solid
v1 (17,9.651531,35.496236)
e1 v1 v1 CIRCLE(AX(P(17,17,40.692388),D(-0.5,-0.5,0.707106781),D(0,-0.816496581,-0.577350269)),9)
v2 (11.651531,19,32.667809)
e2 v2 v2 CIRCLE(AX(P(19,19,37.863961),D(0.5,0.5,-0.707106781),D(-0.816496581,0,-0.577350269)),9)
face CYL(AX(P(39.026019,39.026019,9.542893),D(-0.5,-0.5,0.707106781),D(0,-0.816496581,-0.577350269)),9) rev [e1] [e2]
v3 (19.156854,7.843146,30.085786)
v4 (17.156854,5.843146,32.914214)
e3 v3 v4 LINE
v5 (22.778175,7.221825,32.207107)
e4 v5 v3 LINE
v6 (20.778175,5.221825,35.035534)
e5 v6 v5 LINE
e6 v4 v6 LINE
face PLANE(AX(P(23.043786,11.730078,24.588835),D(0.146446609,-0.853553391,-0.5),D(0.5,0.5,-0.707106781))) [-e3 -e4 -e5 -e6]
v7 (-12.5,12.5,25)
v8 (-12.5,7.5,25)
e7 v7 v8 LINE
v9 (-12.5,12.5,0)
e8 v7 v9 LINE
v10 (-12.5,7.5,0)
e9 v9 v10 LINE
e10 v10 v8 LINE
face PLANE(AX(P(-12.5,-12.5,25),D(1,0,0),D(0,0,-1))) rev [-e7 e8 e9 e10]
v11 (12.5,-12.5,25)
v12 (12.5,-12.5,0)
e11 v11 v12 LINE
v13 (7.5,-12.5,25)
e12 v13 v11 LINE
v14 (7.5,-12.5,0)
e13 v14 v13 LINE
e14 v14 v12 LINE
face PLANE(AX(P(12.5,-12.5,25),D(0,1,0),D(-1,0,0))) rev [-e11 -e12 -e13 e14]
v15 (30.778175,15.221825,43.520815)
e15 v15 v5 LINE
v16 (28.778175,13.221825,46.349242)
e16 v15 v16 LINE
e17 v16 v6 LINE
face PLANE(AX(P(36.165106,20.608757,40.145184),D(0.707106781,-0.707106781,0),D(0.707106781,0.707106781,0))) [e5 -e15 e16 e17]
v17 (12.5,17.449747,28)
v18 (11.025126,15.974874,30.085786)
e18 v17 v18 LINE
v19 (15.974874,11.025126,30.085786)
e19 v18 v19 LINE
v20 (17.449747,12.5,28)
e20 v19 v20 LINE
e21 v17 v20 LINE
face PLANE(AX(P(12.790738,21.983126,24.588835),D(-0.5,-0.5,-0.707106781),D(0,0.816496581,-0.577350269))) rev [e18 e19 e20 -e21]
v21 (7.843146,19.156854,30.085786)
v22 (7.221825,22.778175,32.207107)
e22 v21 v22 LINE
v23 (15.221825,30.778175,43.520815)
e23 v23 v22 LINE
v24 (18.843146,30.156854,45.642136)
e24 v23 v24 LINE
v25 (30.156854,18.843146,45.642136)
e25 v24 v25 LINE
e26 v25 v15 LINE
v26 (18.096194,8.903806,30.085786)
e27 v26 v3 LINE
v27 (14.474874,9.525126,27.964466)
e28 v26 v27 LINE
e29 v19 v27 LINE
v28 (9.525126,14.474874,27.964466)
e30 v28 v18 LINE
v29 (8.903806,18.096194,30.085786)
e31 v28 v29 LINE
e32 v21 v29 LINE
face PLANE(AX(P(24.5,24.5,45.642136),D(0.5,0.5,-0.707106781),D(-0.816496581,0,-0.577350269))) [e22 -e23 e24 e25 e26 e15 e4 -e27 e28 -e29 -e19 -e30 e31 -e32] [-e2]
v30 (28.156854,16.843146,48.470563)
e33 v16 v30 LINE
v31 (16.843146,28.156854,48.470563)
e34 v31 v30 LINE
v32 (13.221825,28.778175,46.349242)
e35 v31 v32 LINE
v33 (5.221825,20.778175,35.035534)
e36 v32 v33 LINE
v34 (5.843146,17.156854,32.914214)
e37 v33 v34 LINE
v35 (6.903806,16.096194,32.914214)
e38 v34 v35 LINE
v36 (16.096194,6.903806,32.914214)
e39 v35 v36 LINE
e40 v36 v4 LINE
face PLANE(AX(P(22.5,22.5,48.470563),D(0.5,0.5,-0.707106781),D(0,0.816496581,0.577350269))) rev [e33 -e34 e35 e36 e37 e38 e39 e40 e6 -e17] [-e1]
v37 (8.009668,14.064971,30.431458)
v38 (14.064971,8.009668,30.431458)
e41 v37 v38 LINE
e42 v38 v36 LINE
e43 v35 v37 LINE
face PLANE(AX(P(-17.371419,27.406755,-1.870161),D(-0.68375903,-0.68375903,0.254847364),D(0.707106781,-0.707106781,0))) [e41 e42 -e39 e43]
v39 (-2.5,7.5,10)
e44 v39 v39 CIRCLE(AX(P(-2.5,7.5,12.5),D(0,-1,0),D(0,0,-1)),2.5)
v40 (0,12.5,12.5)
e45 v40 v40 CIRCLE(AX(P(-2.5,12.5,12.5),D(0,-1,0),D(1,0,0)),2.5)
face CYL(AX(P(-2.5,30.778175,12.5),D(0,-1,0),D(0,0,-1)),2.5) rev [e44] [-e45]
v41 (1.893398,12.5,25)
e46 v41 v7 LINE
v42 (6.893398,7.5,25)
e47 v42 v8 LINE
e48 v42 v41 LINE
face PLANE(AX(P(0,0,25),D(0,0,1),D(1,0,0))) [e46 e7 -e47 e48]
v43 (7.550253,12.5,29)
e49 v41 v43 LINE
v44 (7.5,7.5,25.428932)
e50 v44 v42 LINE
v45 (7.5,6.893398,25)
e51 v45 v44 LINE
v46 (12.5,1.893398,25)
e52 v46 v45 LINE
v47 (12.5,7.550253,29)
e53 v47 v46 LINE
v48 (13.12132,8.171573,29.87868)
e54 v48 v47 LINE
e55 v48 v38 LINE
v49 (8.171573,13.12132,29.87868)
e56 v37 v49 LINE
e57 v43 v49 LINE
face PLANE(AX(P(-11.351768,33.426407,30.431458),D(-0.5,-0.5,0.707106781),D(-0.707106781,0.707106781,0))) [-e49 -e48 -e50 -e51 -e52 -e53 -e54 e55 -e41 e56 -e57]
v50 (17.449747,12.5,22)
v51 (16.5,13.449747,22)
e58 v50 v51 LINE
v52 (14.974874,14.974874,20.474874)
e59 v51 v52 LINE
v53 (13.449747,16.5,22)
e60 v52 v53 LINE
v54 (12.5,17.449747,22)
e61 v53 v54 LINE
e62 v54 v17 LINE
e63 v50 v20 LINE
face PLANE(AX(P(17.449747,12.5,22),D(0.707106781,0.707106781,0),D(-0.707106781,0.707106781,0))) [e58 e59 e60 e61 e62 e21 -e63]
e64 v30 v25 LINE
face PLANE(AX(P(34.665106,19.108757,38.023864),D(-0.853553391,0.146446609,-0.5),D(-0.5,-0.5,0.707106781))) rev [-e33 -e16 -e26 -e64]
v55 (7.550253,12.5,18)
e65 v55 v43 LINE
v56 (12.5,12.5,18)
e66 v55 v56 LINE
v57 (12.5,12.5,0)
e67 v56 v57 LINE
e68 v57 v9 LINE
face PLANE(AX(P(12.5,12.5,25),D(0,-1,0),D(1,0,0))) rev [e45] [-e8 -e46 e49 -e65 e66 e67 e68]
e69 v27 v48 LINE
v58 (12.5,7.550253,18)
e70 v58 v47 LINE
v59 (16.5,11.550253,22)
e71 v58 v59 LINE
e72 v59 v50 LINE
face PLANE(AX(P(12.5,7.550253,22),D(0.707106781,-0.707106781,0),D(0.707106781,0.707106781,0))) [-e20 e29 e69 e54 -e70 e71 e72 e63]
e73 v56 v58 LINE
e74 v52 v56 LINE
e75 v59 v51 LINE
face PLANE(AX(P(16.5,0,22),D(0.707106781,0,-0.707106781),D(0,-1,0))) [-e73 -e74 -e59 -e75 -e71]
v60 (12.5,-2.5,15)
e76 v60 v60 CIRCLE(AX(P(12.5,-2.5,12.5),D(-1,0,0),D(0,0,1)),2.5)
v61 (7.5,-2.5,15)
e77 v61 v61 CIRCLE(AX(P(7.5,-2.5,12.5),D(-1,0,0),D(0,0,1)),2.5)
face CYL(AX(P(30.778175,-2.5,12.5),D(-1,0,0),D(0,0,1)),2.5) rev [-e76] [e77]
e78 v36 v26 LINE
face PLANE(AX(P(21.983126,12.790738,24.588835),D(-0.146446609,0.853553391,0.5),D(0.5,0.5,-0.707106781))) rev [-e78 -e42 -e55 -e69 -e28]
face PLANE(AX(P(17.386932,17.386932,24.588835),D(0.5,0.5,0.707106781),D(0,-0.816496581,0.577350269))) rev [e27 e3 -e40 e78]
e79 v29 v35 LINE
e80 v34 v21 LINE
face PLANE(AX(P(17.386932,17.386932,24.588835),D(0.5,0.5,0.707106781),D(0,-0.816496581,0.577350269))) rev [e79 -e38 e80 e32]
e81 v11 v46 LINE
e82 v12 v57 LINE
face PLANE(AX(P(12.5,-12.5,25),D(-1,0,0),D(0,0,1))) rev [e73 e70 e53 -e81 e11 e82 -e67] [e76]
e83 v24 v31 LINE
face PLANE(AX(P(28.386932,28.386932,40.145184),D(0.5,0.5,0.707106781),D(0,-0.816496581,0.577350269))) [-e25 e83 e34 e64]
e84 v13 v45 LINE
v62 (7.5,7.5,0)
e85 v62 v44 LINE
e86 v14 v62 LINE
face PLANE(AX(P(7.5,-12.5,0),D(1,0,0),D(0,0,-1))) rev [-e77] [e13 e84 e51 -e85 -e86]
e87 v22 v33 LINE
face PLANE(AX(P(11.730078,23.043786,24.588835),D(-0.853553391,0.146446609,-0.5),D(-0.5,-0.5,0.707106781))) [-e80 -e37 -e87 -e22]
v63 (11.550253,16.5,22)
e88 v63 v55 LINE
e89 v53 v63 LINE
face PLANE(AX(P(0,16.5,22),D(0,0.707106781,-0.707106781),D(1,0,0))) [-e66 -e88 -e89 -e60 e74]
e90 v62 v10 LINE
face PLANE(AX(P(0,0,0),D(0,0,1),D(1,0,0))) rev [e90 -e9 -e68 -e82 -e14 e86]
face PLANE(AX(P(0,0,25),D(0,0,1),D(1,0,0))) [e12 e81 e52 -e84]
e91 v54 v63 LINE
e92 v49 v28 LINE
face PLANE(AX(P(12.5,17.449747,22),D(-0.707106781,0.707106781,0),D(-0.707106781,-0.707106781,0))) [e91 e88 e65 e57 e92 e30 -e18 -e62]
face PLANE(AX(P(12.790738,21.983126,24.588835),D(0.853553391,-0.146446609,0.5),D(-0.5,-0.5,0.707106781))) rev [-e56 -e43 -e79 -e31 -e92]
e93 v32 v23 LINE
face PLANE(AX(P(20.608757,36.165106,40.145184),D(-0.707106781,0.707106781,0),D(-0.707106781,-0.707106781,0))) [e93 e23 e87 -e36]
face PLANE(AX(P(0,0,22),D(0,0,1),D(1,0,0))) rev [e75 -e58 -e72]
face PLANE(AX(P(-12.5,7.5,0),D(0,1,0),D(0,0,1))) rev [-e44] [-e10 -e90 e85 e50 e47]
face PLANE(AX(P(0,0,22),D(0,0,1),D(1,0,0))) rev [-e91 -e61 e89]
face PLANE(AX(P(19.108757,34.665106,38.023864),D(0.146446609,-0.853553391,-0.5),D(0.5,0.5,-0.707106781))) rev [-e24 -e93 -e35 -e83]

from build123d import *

# Parameters (mm, degrees)
SKETCH_7_W           = 25
SKETCH_7_H           = 25
EXTRUDE_4_DEPTH      = 25
SKETCH_8_W           = 20
SKETCH_8_H           = 20
CUT_EXTRUDE_1_DEPTH  = 25
EXTRUDE_5_DEPTH      = 10
EXTRUDE_5_DEPTH_BACK = 3
CUT_EXTRUDE_2_DEPTH  = 10
EXTRUDE_6_DEPTH      = 22
CUT_EXTRUDE_3_DEPTH  = 68.266533187
CUT_EXTRUDE_4_DEPTH  = 67.673882167
CHAMFER_1_SIZE       = 4
CHAMFER_1_SIZE_2     = 5.616920973
CHAMFER_2_SIZE       = 3
SKETCH_19_R          = 2.5
CUT_EXTRUDE_5_DEPTH  = 62.956153018
SKETCH_20_R          = 2.5
CUT_EXTRUDE_6_DEPTH  = 62.956153018


with BuildPart() as part:
    # 草图7 → 凸台-拉伸4 (new body)
    with BuildSketch(Plane.XY):
        Rectangle(SKETCH_7_W, SKETCH_7_H)
    extrude(amount=EXTRUDE_4_DEPTH)

    # 草图8 → 切除-拉伸1 (cut)
    with BuildSketch(Plane.XY.offset(25)):
        with Locations((-2.5, -2.5)):
            Rectangle(SKETCH_8_W, SKETCH_8_H)
    extrude(amount=-CUT_EXTRUDE_1_DEPTH, mode=Mode.SUBTRACT)

    # 草图10 → 凸台-拉伸5 (add, two sides: drawn at the far end of the back side and taken through both)
    with BuildSketch(Plane.XY.offset(25).offset(-EXTRUDE_5_DEPTH_BACK)):
        Polygon((7.550252532, 12.5), (12.5, 7.550252532), (17.449747468, 12.5), (12.5, 17.449747468), align=None)
    extrude(amount=EXTRUDE_5_DEPTH + EXTRUDE_5_DEPTH_BACK)

    # 草图12 → 切除-拉伸2 (cut)
    with BuildSketch(Plane(origin=(2.474873734, -2.474873734, 0), x_dir=(0, 0, -1), z_dir=(0.7071067811865479, -0.7071067811865472, 0))):
        Polygon((-35, 21.17766953), (-35, 14.17766953), (-28, 21.17766953), align=None)
    extrude(amount=-CUT_EXTRUDE_2_DEPTH, mode=Mode.SUBTRACT)

    # 草图14 → 凸台-拉伸6 (add)
    with BuildSketch(Plane(origin=(17.386931804, 17.386931804, 24.588834765), x_dir=(0.8660254037844374, -0.2886751345948163, -0.4082482904638636), z_dir=(0.5000000000000024, 0.5000000000000028, 0.707106781186544))):
        Polygon((-9.655381356, -7.592593438), (-7.34598028, -4.326607114), (-13.469704637, 0.003519905), (-14.624405175, -1.629473257), (-15.779105713, -3.262466419), align=None)
        Polygon((-6.797643323, -9.61331938), (-4.488242246, -6.347333056), (-7.34598028, -4.326607114), (-9.655381356, -7.592593438), align=None)
        Polygon((-1.630504213, -8.368058998), (-4.488242246, -6.347333056), (-6.797643323, -9.61331938), (-3.93990529, -11.634045322), (-3.745735964, -11.359448428), (-1.748641805, -8.535130783), align=None)
        Polygon((4.493220144, -12.698186017), (-1.630504213, -8.368058998), (-1.748641805, -8.535130783), (-3.745735964, -11.359448428), (-3.93990529, -11.634045322), (2.183819067, -15.964172341), (3.338519605, -14.331179179), align=None)
    extrude(amount=EXTRUDE_6_DEPTH)

    # 草图15 → 切除-拉伸3 (cut, through all)
    with BuildSketch(Plane(origin=(-5.886931804, -5.886931804, 8.325378798), x_dir=(0.8660254037844424, -0.28867513459480876, 0.4082482904638581), z_dir=(-0.49999999999999367, -0.5000000000000014, 0.7071067811865511))):
        with BuildLine():
            ThreePointArc((35.427552476, 37.374203131), (32.228532553, 44.255237221), (24.905634667, 46.244590168))
            Line((24.905634667, 46.244590168), (27.949470284, 28.503816094))
            ThreePointArc((27.949470284, 28.503816094), (33.308586565, 31.573223054), (35.427552476, 37.374203131))
        make_face()
        with BuildLine():
            Line((27.949470284, 28.503816094), (24.905634667, 46.244590168))
            ThreePointArc((24.905634667, 46.244590168), (17.557165439, 35.852285323), (27.949470284, 28.503816094))
        make_face()
    extrude(amount=-CUT_EXTRUDE_3_DEPTH, mode=Mode.SUBTRACT)

    # 草图17 → 切除-拉伸4 (cut, through all)
    with BuildSketch(Plane(origin=(2.474873734, -2.474873734, 0), x_dir=(0, 0, -1), z_dir=(0.7071067811865479, -0.7071067811865472, 0))):
        Polygon((-32.914213562, 16.263455967), (-25, 14.17766953), (-35, 14.17766953), align=None)
    extrude(amount=-CUT_EXTRUDE_4_DEPTH, mode=Mode.SUBTRACT)

    # 倒角1
    # the kernel refuses this chamfer: 5.616920973, 4 mm, written as the material it adds along each edge
    with BuildSketch(Plane(origin=(-2.724247244, 22.774499775, 25), x_dir=(-0.7071067811865471, -0.707106781186548, 0), z_dir=(0.707106781186548, -0.7071067811865471, 0))) as chamfer_1_piece_1_section:
        Polygon((CHAMFER_1_SIZE, 0), (-CHAMFER_1_SIZE_2 * 0.254847364233, -CHAMFER_1_SIZE_2 * 0.966981292987), (0, 0), align=None)
    chamfer_1_piece_1 = extrude(amount=36.060673858, mode=Mode.PRIVATE)
    chamfer_1_piece_1 = split(chamfer_1_piece_1, bisect_by=Plane(origin=(12.5, 22.774499775, 25), z_dir=(-1, 0, 0)), keep=Keep.TOP, mode=Mode.PRIVATE)
    chamfer_1_piece_1 = split(chamfer_1_piece_1, bisect_by=Plane(origin=(-2.724247244, 12.5, 25), z_dir=(0, -1, 0)), keep=Keep.TOP, mode=Mode.PRIVATE)
    chamfer_1_piece_1 = split(chamfer_1_piece_1, bisect_by=Plane(origin=(-2.724247244, 7.5, 25), z_dir=(0, 1, 0)), keep=Keep.TOP, mode=Mode.PRIVATE)
    add(chamfer_1_piece_1)
    with BuildSketch(Plane(origin=(7.550252532, 12.5, 25), x_dir=(-0.7071067811865471, -0.707106781186548, 0), z_dir=(0.707106781186548, -0.7071067811865471, 0))) as chamfer_1_piece_2_section:
        Polygon((CHAMFER_1_SIZE, 0), (-CHAMFER_1_SIZE_2 * 0.254847364233, -CHAMFER_1_SIZE_2 * 0.966981292987), (0, 0), align=None)
    chamfer_1_piece_2 = extrude(amount=7, mode=Mode.PRIVATE)
    chamfer_1_piece_2 = split(chamfer_1_piece_2, bisect_by=Plane(origin=(7.5, 12.5, 25), z_dir=(1, 0, 0)), keep=Keep.TOP, mode=Mode.PRIVATE)
    add(chamfer_1_piece_2)
    with BuildSketch(Plane(origin=(-2.724247244, 22.774499775, 25), x_dir=(-0.7071067811865471, -0.707106781186548, 0), z_dir=(0.707106781186548, -0.7071067811865471, 0))) as chamfer_1_piece_3_section:
        Polygon((CHAMFER_1_SIZE, 0), (-CHAMFER_1_SIZE_2 * 0.254847364233, -CHAMFER_1_SIZE_2 * 0.966981292987), (0, 0), align=None)
    chamfer_1_piece_3 = extrude(amount=36.060673858, mode=Mode.PRIVATE)
    chamfer_1_piece_3 = split(chamfer_1_piece_3, bisect_by=Plane(origin=(12.5, 22.774499775, 25), z_dir=(-1, 0, 0)), keep=Keep.TOP, mode=Mode.PRIVATE)
    chamfer_1_piece_3 = split(chamfer_1_piece_3, bisect_by=Plane(origin=(12.5, 7.550252532, 25), z_dir=(0.7071067811865479, -0.7071067811865472, 0)), keep=Keep.TOP, mode=Mode.PRIVATE)
    add(chamfer_1_piece_3)
    with BuildSketch(Plane(origin=(-2.73647942, 12.5, 22), x_dir=(0, 0, -1), z_dir=(1, 0, 0))) as chamfer_1_piece_4_section:
        Polygon((CHAMFER_1_SIZE, 0), (0, CHAMFER_1_SIZE), (0, 0), align=None)
    chamfer_1_piece_4 = extrude(amount=15.23647942, mode=Mode.PRIVATE)
    chamfer_1_piece_4 = split(chamfer_1_piece_4, bisect_by=Plane(origin=(2.406886556, 7.356634024, 22), z_dir=(0.7071067811865481, -0.7071067811865469, 0)), keep=Keep.TOP, mode=Mode.PRIVATE)
    add(chamfer_1_piece_4)
    with BuildSketch(Plane(origin=(12.5, 12.5, 22), x_dir=(0, 0, -1), z_dir=(0, -1, 0))) as chamfer_1_piece_5_section:
        Polygon((CHAMFER_1_SIZE, 0), (0, CHAMFER_1_SIZE), (0, 0), align=None)
    chamfer_1_piece_5 = extrude(amount=15.23647942, mode=Mode.PRIVATE)
    chamfer_1_piece_5 = split(chamfer_1_piece_5, bisect_by=Plane(origin=(14.974873734, 10.025126266, 22), z_dir=(-0.7071067811865479, 0.7071067811865472, 0)), keep=Keep.TOP, mode=Mode.PRIVATE)
    add(chamfer_1_piece_5)
    with BuildSketch(Plane(origin=(12.5, 22.786731952, 22), x_dir=(0, 0, -1), z_dir=(0, -1, 0))) as chamfer_1_piece_6a_section:
        Polygon((CHAMFER_1_SIZE, 0), (0, CHAMFER_1_SIZE), (0, 0), align=None)
    chamfer_1_piece_6a = extrude(amount=25.523211372, mode=Mode.PRIVATE)
    chamfer_1_piece_6a = split(chamfer_1_piece_6a, bisect_by=Plane(origin=(12.5, 12.5, 22), z_dir=(0, 1, 0)), keep=Keep.TOP, mode=Mode.PRIVATE)
    chamfer_1_piece_6a = split(chamfer_1_piece_6a, bisect_by=Plane(origin=(9.831507758, 20.11823971, 22), z_dir=(-0.7071067811865471, -0.7071067811865479, 0)), keep=Keep.TOP, mode=Mode.PRIVATE)
    with BuildSketch(Plane(origin=(-2.73647942, 12.5, 22), x_dir=(0, 0, -1), z_dir=(1, 0, 0))) as chamfer_1_piece_6b_section:
        Polygon((CHAMFER_1_SIZE, 0), (0, CHAMFER_1_SIZE), (0, 0), align=None)
    chamfer_1_piece_6b = extrude(amount=25.523211372, mode=Mode.PRIVATE)
    chamfer_1_piece_6b = split(chamfer_1_piece_6b, bisect_by=Plane(origin=(12.5, 12.5, 22), z_dir=(1, 0, 0)), keep=Keep.TOP, mode=Mode.PRIVATE)
    chamfer_1_piece_6b = split(chamfer_1_piece_6b, bisect_by=Plane(origin=(7.356634024, 22.593113444, 22), z_dir=(-0.7071067811865471, -0.7071067811865479, 0)), keep=Keep.TOP, mode=Mode.PRIVATE)
    chamfer_1_piece_6 = chamfer_1_piece_6a & chamfer_1_piece_6b
    add(chamfer_1_piece_6)

    # 倒角2
    # the kernel refuses this chamfer: 3 mm, written as the material it adds along each edge
    with BuildSketch(Plane(origin=(10.117349252, 5.167601784, 38.369577002), x_dir=(-0.4999999999999727, -0.5000000000000319, -0.7071067811865441), z_dir=(0.4999999999999975, 0.49999999999999795, -0.7071067811865509))) as chamfer_2_piece_1_section:
        Polygon((CHAMFER_2_SIZE, 0), (0, -CHAMFER_2_SIZE), (0, 0), align=None)
    chamfer_2_piece_1 = extrude(amount=11.715048964, mode=Mode.PRIVATE)
    chamfer_2_piece_1 = split(chamfer_2_piece_1, bisect_by=Plane(origin=(14.674958319, 9.725210851, 36.670886955), z_dir=(0.6837590295367584, 0.6837590295367588, -0.2548473642278849)), keep=Keep.TOP, mode=Mode.PRIVATE)
    add(chamfer_2_piece_1)
    with BuildSketch(Plane(origin=(10.117349252, 5.167601784, 38.369577002), x_dir=(-0.4999999999999727, -0.5000000000000319, -0.7071067811865441), z_dir=(0.4999999999999975, 0.49999999999999795, -0.7071067811865509))) as chamfer_2_piece_2_section:
        Polygon((CHAMFER_2_SIZE, 0), (0, -CHAMFER_2_SIZE), (0, 0), align=None)
    chamfer_2_piece_2 = extrude(amount=19.430097928, mode=Mode.PRIVATE)
    chamfer_2_piece_2 = split(chamfer_2_piece_2, bisect_by=Plane(origin=(14.674958319, 9.725210851, 36.670886955), z_dir=(-0.6837590295367584, -0.6837590295367588, 0.2548473642278849)), keep=Keep.TOP, mode=Mode.PRIVATE)
    chamfer_2_piece_2 = split(chamfer_2_piece_2, bisect_by=Plane(origin=(14.621320344, 9.671572875, 32), z_dir=(0.5000000000001488, 0.5000000000001488, -0.7071067811863374)), keep=Keep.TOP, mode=Mode.PRIVATE)
    add(chamfer_2_piece_2)
    with BuildSketch(Plane(origin=(5.167601784, 10.117349252, 38.369577002), x_dir=(-0.5000000000000279, -0.4999999999999769, -0.7071067811865442), z_dir=(0.4999999999999972, 0.4999999999999981, -0.7071067811865508))) as chamfer_2_piece_3_section:
        Polygon((CHAMFER_2_SIZE, 0), (0, CHAMFER_2_SIZE), (0, 0), align=None)
    chamfer_2_piece_3 = extrude(amount=11.715048964, mode=Mode.PRIVATE)
    chamfer_2_piece_3 = split(chamfer_2_piece_3, bisect_by=Plane(origin=(9.725210851, 14.674958319, 36.670886955), z_dir=(0.6837590295367584, 0.6837590295367588, -0.2548473642278849)), keep=Keep.TOP, mode=Mode.PRIVATE)
    add(chamfer_2_piece_3)
    with BuildSketch(Plane(origin=(5.167601784, 10.117349252, 38.369577002), x_dir=(-0.5000000000000279, -0.4999999999999769, -0.7071067811865442), z_dir=(0.4999999999999972, 0.4999999999999981, -0.7071067811865508))) as chamfer_2_piece_4_section:
        Polygon((CHAMFER_2_SIZE, 0), (0, CHAMFER_2_SIZE), (0, 0), align=None)
    chamfer_2_piece_4 = extrude(amount=19.430097928, mode=Mode.PRIVATE)
    chamfer_2_piece_4 = split(chamfer_2_piece_4, bisect_by=Plane(origin=(9.725210851, 14.674958319, 36.670886955), z_dir=(-0.6837590295367584, -0.6837590295367588, 0.2548473642278849)), keep=Keep.TOP, mode=Mode.PRIVATE)
    chamfer_2_piece_4 = split(chamfer_2_piece_4, bisect_by=Plane(origin=(9.671572875, 14.621320344, 32), z_dir=(0.5000000000001488, 0.5000000000001488, -0.7071067811863374)), keep=Keep.TOP, mode=Mode.PRIVATE)
    add(chamfer_2_piece_4)
    # the kernel refuses this chamfer: 3 mm, written as the material it takes off along each edge
    with BuildSketch(Plane(origin=(9.579349889, 25.135699075, 24.630422998), x_dir=(0.5000000000000019, 0.500000000000003, 0.7071067811865441), z_dir=(-0.4999999999999936, -0.5000000000000017, 0.707106781186551)), Plane(origin=(36.135699075, 20.579349889, 40.186772184), x_dir=(-0.5000000000000017, -0.5000000000000041, -0.7071067811865435), z_dir=(-0.49999999999999606, -0.4999999999999983, 0.7071067811865517))) as chamfer_2_2_piece_1:
        Polygon((CHAMFER_2_SIZE, 0), (0, -CHAMFER_2_SIZE), (0, 0), align=None)
    extrude(amount=19.430097928, mode=Mode.SUBTRACT)
    with BuildSketch(Plane(origin=(10.864300925, 26.420650111, 53.925926188), x_dir=(0.7071067811865505, -0.7071067811865446, -3.2729791283493846e-15), z_dir=(0.4999999999999941, 0.5000000000000017, -0.7071067811865506)), Plane(origin=(15.420650111, -0.135699075, 38.369577002), x_dir=(-0.7071067811865483, 0.7071067811865468, 1.224326607529039e-15), z_dir=(0.49999999999999667, 0.4999999999999989, -0.7071067811865507))) as chamfer_2_2_piece_2:
        Polygon((CHAMFER_2_SIZE, 0), (0, CHAMFER_2_SIZE), (0, 0), align=None)
    extrude(amount=19.430097928, mode=Mode.SUBTRACT)

    # 草图19 → 切除-拉伸5 (cut, through all)
    with BuildSketch(Plane.XZ.offset(-7.5)):
        with Locations(Location((-2.5, 12.5, 0), (0, 0, 270))):
            Circle(SKETCH_19_R)
    extrude(amount=-CUT_EXTRUDE_5_DEPTH, mode=Mode.SUBTRACT)

    # 草图20 → 切除-拉伸6 (cut, through all)
    with BuildSketch(Plane.ZY.offset(-7.5)):
        with Locations((12.5, -2.5)):
            Circle(SKETCH_20_R)
    extrude(amount=-CUT_EXTRUDE_6_DEPTH, mode=Mode.SUBTRACT)


solid = part.part
